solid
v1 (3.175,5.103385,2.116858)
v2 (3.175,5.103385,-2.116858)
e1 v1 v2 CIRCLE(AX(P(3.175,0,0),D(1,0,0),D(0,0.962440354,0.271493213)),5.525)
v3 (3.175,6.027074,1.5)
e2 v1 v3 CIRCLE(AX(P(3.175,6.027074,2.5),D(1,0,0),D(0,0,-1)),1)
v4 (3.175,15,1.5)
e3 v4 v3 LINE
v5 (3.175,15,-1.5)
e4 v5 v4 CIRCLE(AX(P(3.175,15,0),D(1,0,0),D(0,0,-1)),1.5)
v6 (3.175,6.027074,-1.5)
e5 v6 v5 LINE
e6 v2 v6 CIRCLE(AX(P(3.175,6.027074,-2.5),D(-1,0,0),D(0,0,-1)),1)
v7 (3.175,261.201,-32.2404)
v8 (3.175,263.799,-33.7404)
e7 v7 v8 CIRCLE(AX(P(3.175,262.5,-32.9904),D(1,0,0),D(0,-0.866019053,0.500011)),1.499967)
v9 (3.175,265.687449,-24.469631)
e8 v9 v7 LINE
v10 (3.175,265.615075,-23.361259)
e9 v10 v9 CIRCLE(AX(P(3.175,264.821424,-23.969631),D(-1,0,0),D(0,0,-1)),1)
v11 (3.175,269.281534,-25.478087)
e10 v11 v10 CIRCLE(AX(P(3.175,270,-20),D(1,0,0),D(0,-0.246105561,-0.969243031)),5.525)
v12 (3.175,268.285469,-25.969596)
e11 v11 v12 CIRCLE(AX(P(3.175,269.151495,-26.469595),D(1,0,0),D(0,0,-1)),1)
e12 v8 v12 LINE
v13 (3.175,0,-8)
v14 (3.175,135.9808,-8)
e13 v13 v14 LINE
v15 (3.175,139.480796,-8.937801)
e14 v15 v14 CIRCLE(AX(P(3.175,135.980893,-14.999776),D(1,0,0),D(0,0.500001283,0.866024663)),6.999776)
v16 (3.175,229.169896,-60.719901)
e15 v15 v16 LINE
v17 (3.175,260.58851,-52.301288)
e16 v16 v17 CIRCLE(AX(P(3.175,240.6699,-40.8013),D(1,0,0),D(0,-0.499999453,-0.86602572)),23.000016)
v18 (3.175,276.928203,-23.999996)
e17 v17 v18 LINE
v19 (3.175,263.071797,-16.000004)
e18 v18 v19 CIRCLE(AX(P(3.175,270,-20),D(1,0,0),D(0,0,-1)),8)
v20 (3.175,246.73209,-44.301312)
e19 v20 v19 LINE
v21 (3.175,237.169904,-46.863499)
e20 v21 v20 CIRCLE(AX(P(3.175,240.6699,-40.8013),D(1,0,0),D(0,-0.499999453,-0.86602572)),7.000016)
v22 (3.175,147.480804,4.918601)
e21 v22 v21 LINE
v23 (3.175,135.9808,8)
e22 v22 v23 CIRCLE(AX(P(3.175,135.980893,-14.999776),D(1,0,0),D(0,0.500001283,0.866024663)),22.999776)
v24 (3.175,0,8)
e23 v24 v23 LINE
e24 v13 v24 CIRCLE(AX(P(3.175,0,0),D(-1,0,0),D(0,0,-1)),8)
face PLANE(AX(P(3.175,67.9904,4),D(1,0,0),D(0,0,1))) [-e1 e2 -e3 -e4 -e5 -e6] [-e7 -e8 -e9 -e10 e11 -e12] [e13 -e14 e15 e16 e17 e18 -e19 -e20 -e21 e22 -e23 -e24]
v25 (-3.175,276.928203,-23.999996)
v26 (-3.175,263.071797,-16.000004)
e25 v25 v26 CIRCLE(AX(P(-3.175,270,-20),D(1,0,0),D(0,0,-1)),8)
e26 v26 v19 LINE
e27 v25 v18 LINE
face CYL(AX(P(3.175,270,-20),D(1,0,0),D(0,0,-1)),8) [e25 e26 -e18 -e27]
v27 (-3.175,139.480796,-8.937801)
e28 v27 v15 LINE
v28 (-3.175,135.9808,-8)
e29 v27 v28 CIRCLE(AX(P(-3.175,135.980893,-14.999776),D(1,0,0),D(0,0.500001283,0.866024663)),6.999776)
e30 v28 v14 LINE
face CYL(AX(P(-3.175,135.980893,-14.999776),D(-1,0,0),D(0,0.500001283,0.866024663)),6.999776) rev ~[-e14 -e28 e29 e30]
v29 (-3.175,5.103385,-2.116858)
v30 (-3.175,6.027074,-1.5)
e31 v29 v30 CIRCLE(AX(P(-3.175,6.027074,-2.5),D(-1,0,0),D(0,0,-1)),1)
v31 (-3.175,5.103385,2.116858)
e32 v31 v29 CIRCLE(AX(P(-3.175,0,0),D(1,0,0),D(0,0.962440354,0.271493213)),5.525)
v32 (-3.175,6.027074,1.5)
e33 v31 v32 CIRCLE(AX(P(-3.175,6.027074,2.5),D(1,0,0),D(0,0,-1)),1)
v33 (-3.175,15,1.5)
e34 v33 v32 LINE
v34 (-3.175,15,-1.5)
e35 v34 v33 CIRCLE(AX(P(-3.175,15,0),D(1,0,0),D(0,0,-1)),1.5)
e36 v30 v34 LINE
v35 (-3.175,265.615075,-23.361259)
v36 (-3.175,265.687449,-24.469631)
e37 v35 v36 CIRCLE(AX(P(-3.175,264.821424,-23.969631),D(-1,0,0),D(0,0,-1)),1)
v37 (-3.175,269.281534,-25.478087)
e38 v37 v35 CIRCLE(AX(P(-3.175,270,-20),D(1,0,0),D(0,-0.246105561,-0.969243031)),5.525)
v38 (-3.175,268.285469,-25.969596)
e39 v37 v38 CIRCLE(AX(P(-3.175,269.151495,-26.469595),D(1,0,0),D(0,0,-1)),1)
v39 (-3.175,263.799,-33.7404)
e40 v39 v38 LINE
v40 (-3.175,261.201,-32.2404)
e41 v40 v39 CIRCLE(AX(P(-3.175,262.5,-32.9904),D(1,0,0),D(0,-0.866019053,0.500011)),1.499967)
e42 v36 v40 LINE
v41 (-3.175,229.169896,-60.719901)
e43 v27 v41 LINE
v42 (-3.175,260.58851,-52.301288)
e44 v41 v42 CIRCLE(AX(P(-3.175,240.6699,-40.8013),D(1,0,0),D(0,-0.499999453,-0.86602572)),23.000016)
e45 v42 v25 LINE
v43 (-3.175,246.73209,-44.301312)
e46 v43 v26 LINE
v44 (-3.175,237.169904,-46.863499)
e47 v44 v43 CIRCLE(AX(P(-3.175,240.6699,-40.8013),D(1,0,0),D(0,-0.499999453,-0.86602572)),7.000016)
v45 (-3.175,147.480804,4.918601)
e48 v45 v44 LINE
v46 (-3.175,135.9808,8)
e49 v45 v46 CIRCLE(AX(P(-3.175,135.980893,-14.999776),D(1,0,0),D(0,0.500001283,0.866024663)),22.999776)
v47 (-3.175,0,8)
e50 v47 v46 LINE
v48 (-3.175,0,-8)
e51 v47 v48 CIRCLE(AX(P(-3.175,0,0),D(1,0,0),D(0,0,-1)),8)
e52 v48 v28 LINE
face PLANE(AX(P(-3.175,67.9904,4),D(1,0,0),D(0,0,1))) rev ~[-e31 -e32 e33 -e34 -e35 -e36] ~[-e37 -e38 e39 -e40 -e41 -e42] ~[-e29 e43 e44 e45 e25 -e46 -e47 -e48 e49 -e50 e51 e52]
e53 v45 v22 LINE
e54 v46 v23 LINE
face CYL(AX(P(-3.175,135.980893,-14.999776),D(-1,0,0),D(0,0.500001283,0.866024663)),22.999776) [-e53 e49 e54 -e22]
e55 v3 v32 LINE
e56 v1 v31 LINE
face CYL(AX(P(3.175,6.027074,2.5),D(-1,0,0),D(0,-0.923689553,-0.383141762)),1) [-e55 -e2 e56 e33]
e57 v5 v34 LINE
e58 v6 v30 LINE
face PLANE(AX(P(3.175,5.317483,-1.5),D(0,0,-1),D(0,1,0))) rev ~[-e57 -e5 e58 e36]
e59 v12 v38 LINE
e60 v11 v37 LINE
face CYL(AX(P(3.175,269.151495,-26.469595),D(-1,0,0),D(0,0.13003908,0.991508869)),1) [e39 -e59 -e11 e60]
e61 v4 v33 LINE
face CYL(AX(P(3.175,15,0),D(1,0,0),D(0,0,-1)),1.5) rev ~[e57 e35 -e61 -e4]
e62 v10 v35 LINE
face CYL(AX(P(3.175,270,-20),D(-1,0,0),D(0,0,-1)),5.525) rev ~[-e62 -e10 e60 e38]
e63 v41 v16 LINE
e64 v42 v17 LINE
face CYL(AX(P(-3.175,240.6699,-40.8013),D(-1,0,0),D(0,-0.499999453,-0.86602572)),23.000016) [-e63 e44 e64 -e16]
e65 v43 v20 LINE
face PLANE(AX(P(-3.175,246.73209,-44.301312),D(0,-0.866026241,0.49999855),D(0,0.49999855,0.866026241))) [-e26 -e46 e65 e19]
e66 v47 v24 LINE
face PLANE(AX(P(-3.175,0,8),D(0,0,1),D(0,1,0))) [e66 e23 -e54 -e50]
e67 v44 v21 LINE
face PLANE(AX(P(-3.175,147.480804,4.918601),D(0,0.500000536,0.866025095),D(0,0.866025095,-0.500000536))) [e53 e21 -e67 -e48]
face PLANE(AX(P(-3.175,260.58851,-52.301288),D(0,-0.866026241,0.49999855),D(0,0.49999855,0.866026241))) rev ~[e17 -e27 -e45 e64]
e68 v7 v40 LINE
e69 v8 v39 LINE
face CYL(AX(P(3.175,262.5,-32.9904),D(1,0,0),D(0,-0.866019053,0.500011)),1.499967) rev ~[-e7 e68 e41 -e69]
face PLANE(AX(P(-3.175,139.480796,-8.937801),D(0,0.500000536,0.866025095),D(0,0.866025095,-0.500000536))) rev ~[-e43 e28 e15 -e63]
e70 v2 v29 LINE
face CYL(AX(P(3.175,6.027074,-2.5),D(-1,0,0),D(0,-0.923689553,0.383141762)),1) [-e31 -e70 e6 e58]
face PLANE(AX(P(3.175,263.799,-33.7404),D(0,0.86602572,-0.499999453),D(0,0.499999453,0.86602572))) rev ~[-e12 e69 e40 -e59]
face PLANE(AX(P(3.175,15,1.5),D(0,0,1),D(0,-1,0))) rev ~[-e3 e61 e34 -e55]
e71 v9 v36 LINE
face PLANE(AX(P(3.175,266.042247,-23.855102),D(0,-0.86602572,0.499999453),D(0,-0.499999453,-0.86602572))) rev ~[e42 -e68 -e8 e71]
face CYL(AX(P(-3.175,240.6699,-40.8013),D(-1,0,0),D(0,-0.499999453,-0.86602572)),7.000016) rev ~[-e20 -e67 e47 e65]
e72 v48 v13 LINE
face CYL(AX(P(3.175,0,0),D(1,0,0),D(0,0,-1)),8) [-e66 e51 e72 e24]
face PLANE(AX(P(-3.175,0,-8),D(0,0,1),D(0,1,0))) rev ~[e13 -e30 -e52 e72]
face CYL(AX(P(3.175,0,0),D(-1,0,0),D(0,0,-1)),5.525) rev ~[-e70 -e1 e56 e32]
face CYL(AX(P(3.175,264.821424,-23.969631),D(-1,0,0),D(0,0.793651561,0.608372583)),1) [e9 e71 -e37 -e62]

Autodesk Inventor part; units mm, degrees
ref_plane "YZ Plane" through (0, 0, 0) normal (1, 0, 0) x (0, 1, 0)
ref_plane "XZ Plane" through (0, 0, 0) normal (0, 1, 0) x (-1, 0, 0)
ref_plane "XY Plane" through (0, 0, 0) normal (0, 0, 1) x (1, 0, 0)
sketch "Sketch1" plane through (0, 0, 0) normal (1, 0, 0) x (0, 1, 0)
  line L0 (-10, -10) -> (10, -10) construction
  line L1 (10, -10) -> (10, 10) construction
  line L2 (10, 10) -> (-10, 10) construction
  line L3 (-10, 10) -> (-10, -10) construction
  line L4 (-10, -10) -> (10, 10) construction
  line L5 (10, -10) -> (-10, 10) construction
  line L6 (0, 0) -> (135.9808, 0)
  line L7 (253.6603, -48.3013) -> (270, -20)
  line L8 (114.9075, -11.5) -> (119.815, -20) construction
  line L9 (119.815, -20) -> (114.9075, -28.5) construction
  line L10 (114.9075, -28.5) -> (105.0925, -28.5) construction
  line L11 (105.0925, -28.5) -> (100.185, -20) construction
  line L12 (100.185, -20) -> (105.0925, -11.5) construction
  line L13 (105.0925, -11.5) -> (114.9075, -11.5) construction
  line L14 (143.4808, -2.0096) -> (233.1699, -53.7917)
  arc A0 (233.1699, -53.7917) -> (253.6603, -48.3013) centre (240.6699, -40.8013) ccw
  arc A1 (143.4808, -2.0096) -> (135.9808, 0) centre (135.9808, -15) ccw
  point P0 (140, 0)
  point P1 (246.1603, -61.2917)
  point P2 (110, -20)
  dimension "d0" = 270
  dimension "d4" = 20
  dimension "d5" = 20
  dimension "d60" = 20
  dimension "d65" = 17
  dimension "d66" = 160
  dimension "d68" = 11.5
  dimension "d82" = 150
  dimension "d83" = 140
  dimension "d84" = 15
  dimension "d93" = 15
surface extrude "ExtrusionSrf1" sketch "Sketch1" along normal mid plane 6.35 shown no curves L6 A1 L14 A0 L7
thicken "Thicken1" operation new thickness 16 both sides yes extend neighbours no toward (0, 0, 1) faces at (-1.0583, 45.3269, 0) (1.0583, 139.44, -0.4043) (1.0583, 173.3771, -19.2703) (1.0583, 244.0077, -55.4252) (-1.0583, 259.1068, -38.8675)
sketch "Sketch4" plane through (3.175, 0, 8) normal (1, 0, 0) x (0, 0, -1)
  line L0 (60.3013, 260.5885) -> (32, 276.9282) projected
  line L1 (32, 276.9282) -> (24, 263.0718) projected
  line L2 (52.3013, 246.7321) -> (24, 263.0718) projected
  arc A0 (54.8634, 237.1699) -> (52.3013, 246.7321) centre (48.8013, 240.6699) ccw projected
  line L3 (3.0814, 147.4808) -> (54.8634, 237.1699) projected
  line L4 (0, 0) -> (0, 135.9808) projected
  line L5 (16, 0) -> (0, 0) projected
  line L6 (16, 0) -> (16, 135.9808) projected
  line L7 (16.9378, 139.4808) -> (68.7199, 229.1699) projected
  arc A1 (68.7199, 229.1699) -> (60.3013, 260.5885) centre (48.8013, 240.6699) ccw projected
  line L8 (16, 0) -> (0, 0) projected
  circle A2 centre (8, 0) radius 8
  circle A3 centre (28, 270) radius 8
  arc A4 (3.0814, 147.4808) -> (0, 135.9808) centre (23, 135.9808) ccw projected
  arc A5 (16.9378, 139.4808) -> (16, 135.9808) centre (23, 135.9808) ccw projected
extrude "Extrusion2" add sketch "Sketch4" against normal up to surface (6.35 mm away) contours L1 A3 | A2 L5 | L5 A2 picked at (25.5467, 271.0452)
hole "Hole4" at (3.175, 0, 0) at (3.175, 270, -20) direction (-1, 0, 0) diameter 11.05 end through all
sketch "Sketch5" plane through (3.175, 0, 0) normal (1, 0, 0) x (0, 0, -1)
  line L0 (-8, 0) -> (-8, 135.9808) projected
  arc A0 (-8, 0) -> (8, 0) centre (0, 0) ccw projected
  line L1 (8, 0) -> (8, 135.9808) projected
  line L2 (8.9378, 139.4808) -> (60.7199, 229.1699) projected
  arc A1 (60.7199, 229.1699) -> (52.3013, 260.5885) centre (40.8013, 240.6699) ccw projected
  line L3 (52.3013, 260.5885) -> (24, 276.9282) projected
  arc A2 (24, 276.9282) -> (16, 263.0718) centre (20, 270) ccw projected
  line L4 (44.3013, 246.7321) -> (16, 263.0718) projected
  arc A3 (46.8634, 237.1699) -> (44.3013, 246.7321) centre (40.8013, 240.6699) ccw projected
  line L5 (-4.9186, 147.4808) -> (46.8634, 237.1699) projected
  circle A4 centre (0, 0) radius 5.525 projected
  circle A5 centre (20, 270) radius 5.525 projected
  line L6 (20, 270) -> (32.9904, 262.5) construction
  line L7 (19.25, 268.701) -> (32.2404, 261.201)
  line L8 (33.7404, 263.799) -> (20.75, 271.299)
  arc A6 (20.75, 271.299) -> (19.25, 268.701) centre (20, 270) ccw
  arc A7 (32.2404, 261.201) -> (33.7404, 263.799) centre (32.9904, 262.5) ccw
  line L9 (0, 0) -> (0, 15) construction
  line L10 (1.5, 0) -> (1.5, 15)
  line L11 (-1.5, 15) -> (-1.5, 0)
  arc A8 (-1.5, 0) -> (1.5, 0) centre (0, 0) ccw
  arc A9 (1.5, 15) -> (-1.5, 15) centre (0, 15) ccw
  arc A10 (8.9378, 139.4808) -> (8, 135.9808) centre (15, 135.9808) ccw projected
  arc A11 (-4.9186, 147.4808) -> (-8, 135.9808) centre (15, 135.9808) ccw projected
  point P0 (0, 0)
  point P1 (26.4952, 266.25)
  point P2 (0, 7.5)
  point P3 (-1.5, 5.3175)
  point P4 (1.5, 5.3175)
  point P5 (25.3551, 268.6403)
  point P6 (23.8551, 266.0422)
  dimension "d86" = 3
  dimension "d87" = 15
extrude "Extrusion3" cut sketch "Sketch5" against normal through all contours A4 L11 A9 L10 | A5 L8 A7 L7
fillet "Fillet4" radius 1 4 edges at (0, 266.0422, -23.8551) (0, 268.6403, -25.3551) (0, 5.3175, 1.5) (0, 5.3175, -1.5)
properties part number "Door Upper Parallel Bar"
